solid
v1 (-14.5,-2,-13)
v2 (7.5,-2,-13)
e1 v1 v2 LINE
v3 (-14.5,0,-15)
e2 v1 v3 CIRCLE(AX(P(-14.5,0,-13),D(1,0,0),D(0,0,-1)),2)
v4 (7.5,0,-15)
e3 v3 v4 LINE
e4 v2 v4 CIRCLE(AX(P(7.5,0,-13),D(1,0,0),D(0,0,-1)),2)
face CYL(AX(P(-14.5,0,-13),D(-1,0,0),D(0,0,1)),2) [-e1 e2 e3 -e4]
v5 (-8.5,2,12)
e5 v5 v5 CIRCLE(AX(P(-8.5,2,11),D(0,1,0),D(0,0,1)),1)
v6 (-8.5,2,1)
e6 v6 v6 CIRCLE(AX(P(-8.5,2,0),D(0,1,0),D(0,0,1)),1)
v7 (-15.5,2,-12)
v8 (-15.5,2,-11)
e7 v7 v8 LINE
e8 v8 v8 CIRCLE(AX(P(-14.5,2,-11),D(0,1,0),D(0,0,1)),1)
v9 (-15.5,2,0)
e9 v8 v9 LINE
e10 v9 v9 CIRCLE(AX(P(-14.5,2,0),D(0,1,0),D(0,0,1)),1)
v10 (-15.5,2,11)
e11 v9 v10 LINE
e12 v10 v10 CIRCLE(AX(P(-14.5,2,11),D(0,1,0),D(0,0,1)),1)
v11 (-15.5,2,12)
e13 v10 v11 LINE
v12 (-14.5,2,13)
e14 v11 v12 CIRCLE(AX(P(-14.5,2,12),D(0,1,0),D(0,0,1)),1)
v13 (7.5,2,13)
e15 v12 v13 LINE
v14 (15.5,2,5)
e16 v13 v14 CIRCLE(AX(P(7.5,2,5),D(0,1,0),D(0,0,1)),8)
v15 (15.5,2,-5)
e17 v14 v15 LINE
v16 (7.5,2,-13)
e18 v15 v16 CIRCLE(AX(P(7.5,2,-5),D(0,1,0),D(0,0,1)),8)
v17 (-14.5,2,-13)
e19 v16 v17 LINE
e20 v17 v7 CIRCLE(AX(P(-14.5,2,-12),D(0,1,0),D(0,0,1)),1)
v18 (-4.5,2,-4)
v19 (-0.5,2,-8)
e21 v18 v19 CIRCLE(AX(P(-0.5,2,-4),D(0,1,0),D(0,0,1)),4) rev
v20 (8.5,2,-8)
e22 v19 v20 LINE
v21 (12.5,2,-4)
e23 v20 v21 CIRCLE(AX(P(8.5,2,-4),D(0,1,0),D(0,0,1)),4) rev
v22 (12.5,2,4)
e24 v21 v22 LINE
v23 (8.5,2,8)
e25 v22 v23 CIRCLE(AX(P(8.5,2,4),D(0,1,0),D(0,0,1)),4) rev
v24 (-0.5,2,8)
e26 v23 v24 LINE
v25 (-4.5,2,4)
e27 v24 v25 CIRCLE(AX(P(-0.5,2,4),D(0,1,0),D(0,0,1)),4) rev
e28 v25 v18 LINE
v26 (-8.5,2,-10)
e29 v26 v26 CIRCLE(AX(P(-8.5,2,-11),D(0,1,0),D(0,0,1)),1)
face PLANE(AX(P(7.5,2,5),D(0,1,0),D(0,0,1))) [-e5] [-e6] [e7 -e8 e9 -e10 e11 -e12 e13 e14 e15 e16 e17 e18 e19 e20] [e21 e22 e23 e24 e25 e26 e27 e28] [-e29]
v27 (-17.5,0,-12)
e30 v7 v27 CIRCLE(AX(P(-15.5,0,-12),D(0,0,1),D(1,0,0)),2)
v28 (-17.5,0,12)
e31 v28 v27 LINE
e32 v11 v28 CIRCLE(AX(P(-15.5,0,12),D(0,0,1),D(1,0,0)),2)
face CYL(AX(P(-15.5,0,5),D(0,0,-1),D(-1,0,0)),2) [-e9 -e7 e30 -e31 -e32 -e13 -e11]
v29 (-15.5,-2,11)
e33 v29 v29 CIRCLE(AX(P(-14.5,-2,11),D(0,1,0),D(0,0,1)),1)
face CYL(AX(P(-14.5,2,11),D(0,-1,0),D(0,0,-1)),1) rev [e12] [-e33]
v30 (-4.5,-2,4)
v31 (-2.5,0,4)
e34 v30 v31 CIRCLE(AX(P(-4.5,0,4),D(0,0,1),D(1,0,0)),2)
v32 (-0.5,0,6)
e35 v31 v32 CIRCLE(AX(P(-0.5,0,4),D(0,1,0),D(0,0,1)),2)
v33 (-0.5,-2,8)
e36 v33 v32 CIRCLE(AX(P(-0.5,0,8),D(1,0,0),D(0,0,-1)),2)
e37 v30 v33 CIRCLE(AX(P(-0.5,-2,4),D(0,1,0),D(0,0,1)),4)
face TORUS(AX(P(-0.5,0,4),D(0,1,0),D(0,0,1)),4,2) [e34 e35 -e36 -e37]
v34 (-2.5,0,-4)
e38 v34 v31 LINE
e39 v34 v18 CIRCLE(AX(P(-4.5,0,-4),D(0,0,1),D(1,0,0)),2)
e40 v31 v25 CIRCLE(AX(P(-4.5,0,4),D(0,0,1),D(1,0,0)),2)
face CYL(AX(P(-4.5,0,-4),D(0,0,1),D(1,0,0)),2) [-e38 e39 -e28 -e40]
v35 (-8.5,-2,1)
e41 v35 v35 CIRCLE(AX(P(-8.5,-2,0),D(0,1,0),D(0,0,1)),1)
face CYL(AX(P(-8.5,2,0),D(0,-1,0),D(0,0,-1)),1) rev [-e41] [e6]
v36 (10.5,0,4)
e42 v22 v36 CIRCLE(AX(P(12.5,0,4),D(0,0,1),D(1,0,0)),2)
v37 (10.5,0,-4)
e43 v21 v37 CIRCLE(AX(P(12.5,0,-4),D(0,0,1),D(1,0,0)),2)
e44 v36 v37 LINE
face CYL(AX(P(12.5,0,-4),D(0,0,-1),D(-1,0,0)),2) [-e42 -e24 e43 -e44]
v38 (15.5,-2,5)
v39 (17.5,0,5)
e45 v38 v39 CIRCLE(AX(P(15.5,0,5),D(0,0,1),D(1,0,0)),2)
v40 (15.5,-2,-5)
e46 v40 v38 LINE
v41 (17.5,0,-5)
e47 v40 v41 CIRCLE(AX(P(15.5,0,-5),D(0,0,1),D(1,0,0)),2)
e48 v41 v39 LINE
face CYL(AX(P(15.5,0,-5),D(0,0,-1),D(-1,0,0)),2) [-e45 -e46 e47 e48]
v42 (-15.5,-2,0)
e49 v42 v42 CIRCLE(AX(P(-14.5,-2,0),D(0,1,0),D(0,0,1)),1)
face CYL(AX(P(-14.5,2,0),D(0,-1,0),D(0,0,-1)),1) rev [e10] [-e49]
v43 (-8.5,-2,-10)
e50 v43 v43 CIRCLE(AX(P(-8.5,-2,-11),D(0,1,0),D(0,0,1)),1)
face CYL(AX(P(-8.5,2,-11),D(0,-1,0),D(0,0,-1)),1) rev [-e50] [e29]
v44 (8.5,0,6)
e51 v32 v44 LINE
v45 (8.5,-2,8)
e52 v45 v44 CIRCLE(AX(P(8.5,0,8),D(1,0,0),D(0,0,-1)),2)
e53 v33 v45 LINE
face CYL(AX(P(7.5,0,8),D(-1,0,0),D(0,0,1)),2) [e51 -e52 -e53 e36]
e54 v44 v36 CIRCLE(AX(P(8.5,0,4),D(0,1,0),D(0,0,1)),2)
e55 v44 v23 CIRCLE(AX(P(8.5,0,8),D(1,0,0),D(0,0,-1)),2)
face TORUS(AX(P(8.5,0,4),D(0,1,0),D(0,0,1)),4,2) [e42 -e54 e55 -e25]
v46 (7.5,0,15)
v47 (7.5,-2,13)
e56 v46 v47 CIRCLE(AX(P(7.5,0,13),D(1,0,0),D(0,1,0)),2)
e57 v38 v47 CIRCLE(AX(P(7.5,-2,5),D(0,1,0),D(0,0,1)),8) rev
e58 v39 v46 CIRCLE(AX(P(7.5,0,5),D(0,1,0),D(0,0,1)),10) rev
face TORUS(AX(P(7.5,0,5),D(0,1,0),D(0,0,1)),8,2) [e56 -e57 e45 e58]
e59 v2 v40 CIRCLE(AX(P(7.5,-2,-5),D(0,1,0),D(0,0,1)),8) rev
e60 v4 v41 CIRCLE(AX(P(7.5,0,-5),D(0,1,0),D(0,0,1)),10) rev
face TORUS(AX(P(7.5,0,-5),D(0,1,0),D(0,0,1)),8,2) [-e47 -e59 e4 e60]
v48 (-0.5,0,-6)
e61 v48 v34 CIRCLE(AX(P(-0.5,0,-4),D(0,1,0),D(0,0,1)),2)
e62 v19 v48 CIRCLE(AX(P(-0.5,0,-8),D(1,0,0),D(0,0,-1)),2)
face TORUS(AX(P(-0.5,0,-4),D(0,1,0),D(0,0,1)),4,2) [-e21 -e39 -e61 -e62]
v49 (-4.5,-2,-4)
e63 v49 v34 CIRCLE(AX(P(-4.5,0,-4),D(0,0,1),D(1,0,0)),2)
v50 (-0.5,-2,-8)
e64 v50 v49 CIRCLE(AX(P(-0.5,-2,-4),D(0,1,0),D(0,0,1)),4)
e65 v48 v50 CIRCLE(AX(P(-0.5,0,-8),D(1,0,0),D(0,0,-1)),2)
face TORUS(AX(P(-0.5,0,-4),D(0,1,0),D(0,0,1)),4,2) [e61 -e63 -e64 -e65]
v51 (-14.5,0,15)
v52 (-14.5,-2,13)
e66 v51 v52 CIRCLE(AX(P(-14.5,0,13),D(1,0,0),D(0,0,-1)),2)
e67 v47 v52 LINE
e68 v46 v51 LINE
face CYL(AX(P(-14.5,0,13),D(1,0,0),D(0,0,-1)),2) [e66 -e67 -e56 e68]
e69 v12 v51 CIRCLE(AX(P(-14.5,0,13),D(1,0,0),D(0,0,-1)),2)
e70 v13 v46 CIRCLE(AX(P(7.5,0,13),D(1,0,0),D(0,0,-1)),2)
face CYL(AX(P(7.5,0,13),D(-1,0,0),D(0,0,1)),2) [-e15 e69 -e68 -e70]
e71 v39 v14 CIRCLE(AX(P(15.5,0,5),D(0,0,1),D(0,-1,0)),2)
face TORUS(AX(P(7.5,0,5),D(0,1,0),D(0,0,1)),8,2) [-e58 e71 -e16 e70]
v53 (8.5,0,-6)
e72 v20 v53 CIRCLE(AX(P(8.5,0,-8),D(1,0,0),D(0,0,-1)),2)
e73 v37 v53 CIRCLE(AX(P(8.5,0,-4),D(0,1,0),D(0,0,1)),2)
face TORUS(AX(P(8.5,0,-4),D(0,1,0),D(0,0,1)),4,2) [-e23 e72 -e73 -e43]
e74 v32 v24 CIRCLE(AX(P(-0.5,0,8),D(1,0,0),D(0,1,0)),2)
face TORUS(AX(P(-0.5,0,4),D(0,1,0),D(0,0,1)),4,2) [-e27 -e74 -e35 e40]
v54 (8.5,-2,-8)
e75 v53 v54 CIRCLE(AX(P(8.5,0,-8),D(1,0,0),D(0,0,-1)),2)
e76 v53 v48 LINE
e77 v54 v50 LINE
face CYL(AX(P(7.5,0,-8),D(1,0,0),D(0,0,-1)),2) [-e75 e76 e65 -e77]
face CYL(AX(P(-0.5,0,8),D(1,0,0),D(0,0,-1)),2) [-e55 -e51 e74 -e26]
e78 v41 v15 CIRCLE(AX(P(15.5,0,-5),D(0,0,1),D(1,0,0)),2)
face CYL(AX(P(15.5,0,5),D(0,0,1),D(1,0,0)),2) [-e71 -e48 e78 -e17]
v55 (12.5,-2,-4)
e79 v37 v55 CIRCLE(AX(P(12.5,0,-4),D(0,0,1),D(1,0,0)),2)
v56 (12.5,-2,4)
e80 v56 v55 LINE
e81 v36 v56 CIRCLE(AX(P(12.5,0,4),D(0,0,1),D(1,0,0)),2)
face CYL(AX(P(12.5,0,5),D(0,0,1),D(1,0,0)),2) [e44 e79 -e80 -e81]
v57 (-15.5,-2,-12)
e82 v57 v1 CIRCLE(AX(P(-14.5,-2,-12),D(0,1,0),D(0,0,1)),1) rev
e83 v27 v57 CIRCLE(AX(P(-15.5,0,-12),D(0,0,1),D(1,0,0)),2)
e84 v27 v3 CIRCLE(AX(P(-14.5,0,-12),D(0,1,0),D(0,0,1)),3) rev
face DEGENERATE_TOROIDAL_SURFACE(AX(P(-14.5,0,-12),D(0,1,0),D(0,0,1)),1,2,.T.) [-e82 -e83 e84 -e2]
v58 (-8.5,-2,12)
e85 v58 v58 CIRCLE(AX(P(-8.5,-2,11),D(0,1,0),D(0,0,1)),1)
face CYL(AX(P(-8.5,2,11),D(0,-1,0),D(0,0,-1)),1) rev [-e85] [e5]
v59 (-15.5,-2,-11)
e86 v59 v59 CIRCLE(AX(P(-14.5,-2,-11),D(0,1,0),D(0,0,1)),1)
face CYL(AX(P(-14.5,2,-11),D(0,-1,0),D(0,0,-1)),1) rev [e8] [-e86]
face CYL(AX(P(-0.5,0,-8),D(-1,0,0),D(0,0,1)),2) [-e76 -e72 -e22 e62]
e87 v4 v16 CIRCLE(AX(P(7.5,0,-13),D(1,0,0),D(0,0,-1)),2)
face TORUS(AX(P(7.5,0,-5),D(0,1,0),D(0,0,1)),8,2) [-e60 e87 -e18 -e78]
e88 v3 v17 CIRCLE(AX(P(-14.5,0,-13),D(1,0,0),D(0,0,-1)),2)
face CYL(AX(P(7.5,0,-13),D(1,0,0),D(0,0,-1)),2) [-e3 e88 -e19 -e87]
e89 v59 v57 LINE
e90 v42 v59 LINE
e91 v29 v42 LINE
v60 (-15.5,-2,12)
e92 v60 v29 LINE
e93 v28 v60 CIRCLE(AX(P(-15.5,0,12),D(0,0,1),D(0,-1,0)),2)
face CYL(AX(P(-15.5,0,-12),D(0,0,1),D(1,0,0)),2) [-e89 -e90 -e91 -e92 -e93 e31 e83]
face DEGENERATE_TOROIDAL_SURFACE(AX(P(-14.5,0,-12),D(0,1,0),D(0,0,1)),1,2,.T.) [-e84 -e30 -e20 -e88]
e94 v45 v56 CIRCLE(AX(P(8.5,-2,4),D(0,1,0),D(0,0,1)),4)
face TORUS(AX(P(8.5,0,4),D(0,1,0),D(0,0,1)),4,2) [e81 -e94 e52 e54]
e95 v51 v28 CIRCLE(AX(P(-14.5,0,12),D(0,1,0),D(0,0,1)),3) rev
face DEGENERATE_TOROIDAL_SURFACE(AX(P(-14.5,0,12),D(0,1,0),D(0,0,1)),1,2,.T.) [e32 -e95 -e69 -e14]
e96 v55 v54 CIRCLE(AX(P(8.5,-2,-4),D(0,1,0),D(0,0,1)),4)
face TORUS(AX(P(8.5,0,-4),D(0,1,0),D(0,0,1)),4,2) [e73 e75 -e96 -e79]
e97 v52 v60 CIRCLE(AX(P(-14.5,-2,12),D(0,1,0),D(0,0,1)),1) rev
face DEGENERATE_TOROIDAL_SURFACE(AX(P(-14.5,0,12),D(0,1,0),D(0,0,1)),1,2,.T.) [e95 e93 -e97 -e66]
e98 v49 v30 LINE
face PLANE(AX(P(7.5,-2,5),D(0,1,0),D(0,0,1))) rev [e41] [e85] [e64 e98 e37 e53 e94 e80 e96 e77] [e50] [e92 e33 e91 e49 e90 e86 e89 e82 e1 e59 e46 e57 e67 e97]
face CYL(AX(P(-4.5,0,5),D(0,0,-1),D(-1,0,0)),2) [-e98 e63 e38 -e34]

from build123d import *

# Parameters (mm, degrees)
SKETCH1_R           = 1
BOSS_EXTRUDE1_DEPTH = 2
FILLET1_R           = 2


with BuildPart() as part:
    # Sketch1 → Boss-Extrude1 (new, symmetric)
    with BuildSketch(Plane(origin=(0, 0, 0), x_dir=(1, 0, 0), z_dir=(0, 1, 0))):
        with BuildLine():
            Line((-14.5, 15), (7.5, 15))
            ThreePointArc((7.5, 15), (14.571067812, 12.071067812), (17.5, 5))
            Line((17.5, 5), (17.5, -5))
            ThreePointArc((17.5, -5), (14.571067812, -12.071067812), (7.5, -15))
            Line((7.5, -15), (-14.5, -15))
            ThreePointArc((-14.5, -15), (-16.621320344, -14.121320344), (-17.5, -12))
            Line((-17.5, -12), (-17.5, 12))
            ThreePointArc((-17.5, 12), (-16.621320344, 14.121320344), (-14.5, 15))
        make_face()
        with Locations(Location((-8.5, 11, 0), (0, 0, 270))):
            Circle(SKETCH1_R, mode=Mode.SUBTRACT)
        with Locations(Location((-14.5, 11, 0), (0, 0, 270))):
            Circle(SKETCH1_R, mode=Mode.SUBTRACT)
        with Locations(Location((-14.5, -11, 0), (0, 0, 270))):
            Circle(SKETCH1_R, mode=Mode.SUBTRACT)
        with Locations(Location((-8.5, -11, 0), (0, 0, 270))):
            Circle(SKETCH1_R, mode=Mode.SUBTRACT)
        with Locations(Location((-8.5, 0, 0), (0, 0, 270))):
            Circle(SKETCH1_R, mode=Mode.SUBTRACT)
        with Locations(Location((-14.5, 0, 0), (0, 0, 270))):
            Circle(SKETCH1_R, mode=Mode.SUBTRACT)
        with BuildLine():
            Line((-0.5, 6), (8.5, 6))
            ThreePointArc((8.5, 6), (9.914213562, 5.414213562), (10.5, 4))
            Line((10.5, 4), (10.5, -4))
            ThreePointArc((10.5, -4), (9.914213562, -5.414213562), (8.5, -6))
            Line((8.5, -6), (-0.5, -6))
            ThreePointArc((-0.5, -6), (-1.914213562, -5.414213562), (-2.5, -4))
            Line((-2.5, -4), (-2.5, 4))
            ThreePointArc((-2.5, 4), (-1.914213562, 5.414213562), (-0.5, 6))
        make_face(mode=Mode.SUBTRACT)
    extrude(amount=BOSS_EXTRUDE1_DEPTH, both=True)

    # Fillet1
    fillet1_edges = [part.edges().sort_by_distance(p)[0] for p in [
        (14.571067812, -2, 12.071067812),
        (-3.5, -2, 15),
        (-16.621320344, -2, 14.121320344),
        (-17.5, -2, 0),
        (-16.621320344, -2, -14.121320344),
        (-3.5, -2, -15),
        (14.571067812, -2, -12.071067812),
        (14.571067812, 2, 12.071067812),
        (-3.5, 2, 15),
        (-16.621320344, 2, 14.121320344),
        (-17.5, 2, 0),
        (-16.621320344, 2, -14.121320344),
        (-3.5, 2, -15),
        (14.571067812, 2, -12.071067812),
        (9.914213562, -2, 5.414213562),
        (4, -2, 6),
        (-1.914213562, -2, 5.414213562),
        (-2.5, -2, 0),
        (-1.914213562, -2, -5.414213562),
        (4, -2, -6),
        (9.914213562, -2, -5.414213562),
        (-1.914213562, 2, -5.414213562),
        (4, 2, -6),
        (9.914213562, 2, -5.414213562),
        (10.5, 2, 0),
        (9.914213562, 2, 5.414213562),
        (4, 2, 6),
        (-1.914213562, 2, 5.414213562),
        (17.5, -2, 0),
        (17.5, 2, 0),
        (10.5, -2, 0),
        (-2.5, 2, 0),
    ]]
    fillet(fillet1_edges, radius=FILLET1_R - 0.0001)  # a hair under: the kernel refuses the full size


solid = part.part
